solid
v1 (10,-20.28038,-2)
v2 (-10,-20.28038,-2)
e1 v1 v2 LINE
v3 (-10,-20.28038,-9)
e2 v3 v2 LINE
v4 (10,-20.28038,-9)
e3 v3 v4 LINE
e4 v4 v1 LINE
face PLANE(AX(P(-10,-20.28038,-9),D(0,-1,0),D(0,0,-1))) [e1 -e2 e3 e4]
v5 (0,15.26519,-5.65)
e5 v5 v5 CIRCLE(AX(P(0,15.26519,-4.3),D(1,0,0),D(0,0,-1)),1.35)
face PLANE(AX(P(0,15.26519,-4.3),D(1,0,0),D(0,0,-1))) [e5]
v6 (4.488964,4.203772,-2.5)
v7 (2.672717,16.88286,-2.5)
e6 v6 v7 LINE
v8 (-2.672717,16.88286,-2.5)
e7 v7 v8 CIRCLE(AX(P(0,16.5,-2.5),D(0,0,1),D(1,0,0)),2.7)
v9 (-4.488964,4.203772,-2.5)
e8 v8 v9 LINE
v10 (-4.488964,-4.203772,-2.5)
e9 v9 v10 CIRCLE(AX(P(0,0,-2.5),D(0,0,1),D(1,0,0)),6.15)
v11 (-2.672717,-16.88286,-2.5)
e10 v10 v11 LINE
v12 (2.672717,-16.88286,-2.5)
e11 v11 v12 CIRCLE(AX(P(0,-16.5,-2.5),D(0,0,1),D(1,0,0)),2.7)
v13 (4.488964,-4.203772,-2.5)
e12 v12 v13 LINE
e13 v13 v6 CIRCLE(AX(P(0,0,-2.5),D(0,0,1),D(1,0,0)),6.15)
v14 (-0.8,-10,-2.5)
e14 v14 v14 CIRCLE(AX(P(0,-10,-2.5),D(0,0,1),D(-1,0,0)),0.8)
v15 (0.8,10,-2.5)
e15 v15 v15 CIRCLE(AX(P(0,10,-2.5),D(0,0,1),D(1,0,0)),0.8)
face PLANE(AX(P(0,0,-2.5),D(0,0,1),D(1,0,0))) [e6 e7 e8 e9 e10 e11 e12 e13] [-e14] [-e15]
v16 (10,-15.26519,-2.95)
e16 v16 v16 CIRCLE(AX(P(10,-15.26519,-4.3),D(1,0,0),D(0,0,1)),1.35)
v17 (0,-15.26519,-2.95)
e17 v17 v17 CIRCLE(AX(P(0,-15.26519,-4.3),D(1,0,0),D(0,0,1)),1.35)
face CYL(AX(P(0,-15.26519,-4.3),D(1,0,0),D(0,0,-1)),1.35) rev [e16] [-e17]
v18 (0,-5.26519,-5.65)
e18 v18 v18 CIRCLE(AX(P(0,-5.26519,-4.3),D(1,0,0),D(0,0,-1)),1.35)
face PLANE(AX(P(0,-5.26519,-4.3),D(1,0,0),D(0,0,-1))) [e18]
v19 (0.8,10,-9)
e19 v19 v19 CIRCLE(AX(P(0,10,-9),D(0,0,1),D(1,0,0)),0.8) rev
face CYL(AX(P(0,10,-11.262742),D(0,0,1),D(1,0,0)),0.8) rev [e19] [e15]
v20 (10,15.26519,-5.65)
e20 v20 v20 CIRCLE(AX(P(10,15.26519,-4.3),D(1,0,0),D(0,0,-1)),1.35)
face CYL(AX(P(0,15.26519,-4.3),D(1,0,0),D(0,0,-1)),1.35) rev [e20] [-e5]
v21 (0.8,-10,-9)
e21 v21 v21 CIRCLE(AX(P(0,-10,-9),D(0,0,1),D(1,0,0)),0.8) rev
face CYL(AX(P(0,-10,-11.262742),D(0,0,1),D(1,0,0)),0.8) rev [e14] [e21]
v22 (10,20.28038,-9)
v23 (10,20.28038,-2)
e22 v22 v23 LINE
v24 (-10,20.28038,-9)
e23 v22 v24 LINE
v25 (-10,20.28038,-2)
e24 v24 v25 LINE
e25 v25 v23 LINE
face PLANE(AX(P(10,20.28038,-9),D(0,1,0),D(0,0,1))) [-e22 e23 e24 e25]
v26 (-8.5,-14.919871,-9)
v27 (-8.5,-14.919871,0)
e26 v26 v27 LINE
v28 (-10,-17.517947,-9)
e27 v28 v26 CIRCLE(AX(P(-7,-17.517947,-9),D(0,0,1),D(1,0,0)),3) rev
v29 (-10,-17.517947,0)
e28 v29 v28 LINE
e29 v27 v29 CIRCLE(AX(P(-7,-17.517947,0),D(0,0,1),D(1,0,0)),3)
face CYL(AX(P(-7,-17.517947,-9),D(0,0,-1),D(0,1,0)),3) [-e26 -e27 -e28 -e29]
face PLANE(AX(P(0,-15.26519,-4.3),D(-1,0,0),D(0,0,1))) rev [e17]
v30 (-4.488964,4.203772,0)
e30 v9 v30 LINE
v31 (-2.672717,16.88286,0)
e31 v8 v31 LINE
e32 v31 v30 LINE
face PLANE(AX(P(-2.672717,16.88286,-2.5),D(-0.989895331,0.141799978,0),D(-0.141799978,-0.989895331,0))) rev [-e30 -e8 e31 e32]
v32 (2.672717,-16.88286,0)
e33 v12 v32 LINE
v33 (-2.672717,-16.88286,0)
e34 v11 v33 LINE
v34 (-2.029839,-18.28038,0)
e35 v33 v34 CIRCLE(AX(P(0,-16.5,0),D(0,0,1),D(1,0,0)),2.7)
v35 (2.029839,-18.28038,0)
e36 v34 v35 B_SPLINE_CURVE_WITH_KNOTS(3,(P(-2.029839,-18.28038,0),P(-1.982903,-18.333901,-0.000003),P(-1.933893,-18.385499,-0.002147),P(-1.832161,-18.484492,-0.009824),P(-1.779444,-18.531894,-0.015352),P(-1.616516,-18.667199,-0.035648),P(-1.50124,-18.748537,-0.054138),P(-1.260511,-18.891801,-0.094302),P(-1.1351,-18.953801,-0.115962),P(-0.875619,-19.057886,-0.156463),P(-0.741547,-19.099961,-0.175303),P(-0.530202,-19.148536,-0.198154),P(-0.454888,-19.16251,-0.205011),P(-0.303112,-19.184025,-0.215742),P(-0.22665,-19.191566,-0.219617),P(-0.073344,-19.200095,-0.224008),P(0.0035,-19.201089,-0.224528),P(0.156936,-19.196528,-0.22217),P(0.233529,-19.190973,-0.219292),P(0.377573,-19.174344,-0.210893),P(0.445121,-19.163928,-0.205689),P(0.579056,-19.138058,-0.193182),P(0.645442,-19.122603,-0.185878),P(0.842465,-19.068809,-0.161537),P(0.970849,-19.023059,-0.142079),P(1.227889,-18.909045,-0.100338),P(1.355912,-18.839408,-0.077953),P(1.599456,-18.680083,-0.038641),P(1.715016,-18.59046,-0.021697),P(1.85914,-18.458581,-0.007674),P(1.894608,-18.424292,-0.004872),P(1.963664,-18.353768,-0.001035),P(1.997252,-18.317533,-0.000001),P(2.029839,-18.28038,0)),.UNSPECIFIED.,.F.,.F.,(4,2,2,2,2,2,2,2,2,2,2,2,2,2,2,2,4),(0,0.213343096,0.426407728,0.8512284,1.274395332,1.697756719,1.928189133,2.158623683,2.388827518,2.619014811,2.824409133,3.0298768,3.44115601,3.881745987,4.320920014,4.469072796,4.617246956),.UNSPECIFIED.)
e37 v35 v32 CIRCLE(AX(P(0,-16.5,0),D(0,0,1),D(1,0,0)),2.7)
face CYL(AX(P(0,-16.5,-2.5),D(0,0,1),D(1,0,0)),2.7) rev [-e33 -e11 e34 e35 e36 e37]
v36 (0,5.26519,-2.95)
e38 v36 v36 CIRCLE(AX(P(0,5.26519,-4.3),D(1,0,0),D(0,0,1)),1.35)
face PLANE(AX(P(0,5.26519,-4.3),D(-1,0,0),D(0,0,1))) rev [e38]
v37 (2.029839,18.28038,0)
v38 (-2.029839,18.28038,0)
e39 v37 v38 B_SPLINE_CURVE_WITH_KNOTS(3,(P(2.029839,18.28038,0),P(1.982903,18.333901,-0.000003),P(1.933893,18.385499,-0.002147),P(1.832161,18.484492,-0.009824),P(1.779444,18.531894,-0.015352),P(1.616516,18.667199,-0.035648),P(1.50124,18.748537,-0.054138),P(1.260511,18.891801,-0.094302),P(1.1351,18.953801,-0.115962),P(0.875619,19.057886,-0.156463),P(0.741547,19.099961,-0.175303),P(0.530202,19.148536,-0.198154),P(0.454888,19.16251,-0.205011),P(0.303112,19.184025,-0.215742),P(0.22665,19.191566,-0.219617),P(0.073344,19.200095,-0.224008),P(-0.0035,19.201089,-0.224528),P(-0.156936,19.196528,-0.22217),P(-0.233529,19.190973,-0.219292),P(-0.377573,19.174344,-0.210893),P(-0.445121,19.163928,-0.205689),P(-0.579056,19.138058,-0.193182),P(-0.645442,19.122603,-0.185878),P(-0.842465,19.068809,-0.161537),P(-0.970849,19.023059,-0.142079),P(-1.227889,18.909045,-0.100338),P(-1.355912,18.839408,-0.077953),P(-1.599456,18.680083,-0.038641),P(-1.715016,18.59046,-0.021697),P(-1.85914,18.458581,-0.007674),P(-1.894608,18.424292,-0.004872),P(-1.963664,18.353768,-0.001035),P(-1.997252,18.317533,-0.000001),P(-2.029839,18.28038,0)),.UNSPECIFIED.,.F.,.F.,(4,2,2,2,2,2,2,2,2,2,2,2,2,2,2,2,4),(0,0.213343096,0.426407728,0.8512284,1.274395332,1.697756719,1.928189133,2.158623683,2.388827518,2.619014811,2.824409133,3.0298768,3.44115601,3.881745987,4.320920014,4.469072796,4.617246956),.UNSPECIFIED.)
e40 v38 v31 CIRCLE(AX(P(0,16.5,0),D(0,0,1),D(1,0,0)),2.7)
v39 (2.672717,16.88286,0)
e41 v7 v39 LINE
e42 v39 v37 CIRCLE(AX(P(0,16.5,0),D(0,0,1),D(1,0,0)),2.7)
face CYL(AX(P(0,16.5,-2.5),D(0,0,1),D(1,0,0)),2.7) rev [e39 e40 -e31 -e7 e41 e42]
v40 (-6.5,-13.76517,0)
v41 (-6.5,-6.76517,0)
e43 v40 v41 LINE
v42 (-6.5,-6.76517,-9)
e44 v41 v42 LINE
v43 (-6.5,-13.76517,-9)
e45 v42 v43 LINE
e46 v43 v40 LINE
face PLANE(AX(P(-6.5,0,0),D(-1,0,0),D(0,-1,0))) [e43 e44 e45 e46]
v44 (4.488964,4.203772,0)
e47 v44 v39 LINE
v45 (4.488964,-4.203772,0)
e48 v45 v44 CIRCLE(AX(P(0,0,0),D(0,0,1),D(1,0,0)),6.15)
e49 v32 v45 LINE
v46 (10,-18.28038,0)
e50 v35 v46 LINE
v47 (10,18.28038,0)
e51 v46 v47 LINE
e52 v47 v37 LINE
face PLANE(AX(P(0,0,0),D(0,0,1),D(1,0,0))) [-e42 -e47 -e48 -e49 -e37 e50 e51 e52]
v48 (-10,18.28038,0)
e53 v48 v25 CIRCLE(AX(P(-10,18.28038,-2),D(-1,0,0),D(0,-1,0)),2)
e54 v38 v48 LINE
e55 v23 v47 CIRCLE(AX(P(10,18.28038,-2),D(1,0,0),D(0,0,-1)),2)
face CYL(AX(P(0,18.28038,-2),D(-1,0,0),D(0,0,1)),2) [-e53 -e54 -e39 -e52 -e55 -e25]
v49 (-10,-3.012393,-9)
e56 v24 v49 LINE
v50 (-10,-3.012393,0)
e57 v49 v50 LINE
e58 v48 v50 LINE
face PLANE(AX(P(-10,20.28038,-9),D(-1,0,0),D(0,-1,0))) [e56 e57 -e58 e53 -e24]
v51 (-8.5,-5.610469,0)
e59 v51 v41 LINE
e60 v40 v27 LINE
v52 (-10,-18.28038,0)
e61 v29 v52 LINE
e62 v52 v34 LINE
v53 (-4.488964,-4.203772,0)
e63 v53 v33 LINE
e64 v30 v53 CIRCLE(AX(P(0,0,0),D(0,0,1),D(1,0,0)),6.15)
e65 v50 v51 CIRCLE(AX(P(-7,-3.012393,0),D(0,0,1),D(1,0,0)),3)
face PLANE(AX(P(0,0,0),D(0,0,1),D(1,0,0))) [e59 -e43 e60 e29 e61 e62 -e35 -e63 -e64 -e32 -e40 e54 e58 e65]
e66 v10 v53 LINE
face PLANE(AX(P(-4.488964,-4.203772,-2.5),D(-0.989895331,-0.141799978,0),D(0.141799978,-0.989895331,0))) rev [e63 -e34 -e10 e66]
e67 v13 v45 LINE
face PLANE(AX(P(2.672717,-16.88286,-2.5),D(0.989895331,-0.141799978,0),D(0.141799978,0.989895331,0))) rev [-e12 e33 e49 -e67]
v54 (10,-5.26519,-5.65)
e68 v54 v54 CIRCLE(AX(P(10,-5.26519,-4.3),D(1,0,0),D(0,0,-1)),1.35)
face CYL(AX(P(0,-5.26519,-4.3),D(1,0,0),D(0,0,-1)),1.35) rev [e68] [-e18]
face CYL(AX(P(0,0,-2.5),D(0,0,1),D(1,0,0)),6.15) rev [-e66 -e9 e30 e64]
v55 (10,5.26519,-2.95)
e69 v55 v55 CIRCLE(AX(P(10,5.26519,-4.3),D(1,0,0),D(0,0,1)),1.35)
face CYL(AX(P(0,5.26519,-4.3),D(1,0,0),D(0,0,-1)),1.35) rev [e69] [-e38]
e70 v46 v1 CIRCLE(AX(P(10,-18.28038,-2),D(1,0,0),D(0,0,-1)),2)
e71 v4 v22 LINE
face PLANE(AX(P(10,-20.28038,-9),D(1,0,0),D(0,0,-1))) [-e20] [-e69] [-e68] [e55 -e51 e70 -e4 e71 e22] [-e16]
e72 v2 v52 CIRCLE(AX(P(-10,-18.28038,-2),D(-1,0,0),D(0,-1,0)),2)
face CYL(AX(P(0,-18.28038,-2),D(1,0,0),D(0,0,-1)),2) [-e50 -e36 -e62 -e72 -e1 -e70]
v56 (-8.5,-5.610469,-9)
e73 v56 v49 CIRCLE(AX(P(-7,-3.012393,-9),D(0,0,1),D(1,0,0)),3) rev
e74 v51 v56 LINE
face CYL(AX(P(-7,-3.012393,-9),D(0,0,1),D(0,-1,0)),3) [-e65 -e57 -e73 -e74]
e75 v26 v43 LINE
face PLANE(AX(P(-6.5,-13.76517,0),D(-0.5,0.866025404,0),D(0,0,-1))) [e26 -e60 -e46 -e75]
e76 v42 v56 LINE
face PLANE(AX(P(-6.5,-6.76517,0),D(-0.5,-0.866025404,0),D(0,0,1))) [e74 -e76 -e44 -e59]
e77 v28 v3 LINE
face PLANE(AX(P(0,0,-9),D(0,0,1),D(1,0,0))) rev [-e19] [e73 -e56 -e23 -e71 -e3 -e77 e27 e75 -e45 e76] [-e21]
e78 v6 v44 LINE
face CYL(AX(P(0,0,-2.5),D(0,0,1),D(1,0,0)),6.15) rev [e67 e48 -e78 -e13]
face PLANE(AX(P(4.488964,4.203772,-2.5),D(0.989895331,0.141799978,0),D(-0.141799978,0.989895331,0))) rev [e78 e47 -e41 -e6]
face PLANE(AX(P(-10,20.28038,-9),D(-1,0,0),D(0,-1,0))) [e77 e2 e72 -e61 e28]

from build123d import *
from OCP.BRepFilletAPI import BRepFilletAPI_MakeChamfer

# Parameters (mm, degrees)
SKETCH1_W           = 20
SKETCH1_H           = 40.56076
BOSS_EXTRUDE1_DEPTH = 9
SKETCH6_R           = 1.35
CUT_EXTRUDE1_DEPTH  = 10
CUT_EXTRUDE2_DEPTH  = 2.5
FILLET1_R           = 2
SKETCH9_R           = 0.8
CUT_EXTRUDE3_DEPTH  = 6.5
SKETCH10_W          = 9
SKETCH10_H          = 7
CUT_EXTRUDE4_DEPTH  = 3.5
CHAMFER1_SIZE       = 2.020725942
CHAMFER1_SIZE_2     = 3.5
FILLET2_R           = 3


# Some blends are built 0.0001 mm under size
with BuildPart() as part:
    # Sketch1 → Boss-Extrude1 (new body)
    with BuildSketch(Plane.XY):
        Rectangle(SKETCH1_W, SKETCH1_H)
    extrude(amount=-BOSS_EXTRUDE1_DEPTH)

    # Sketch6 → Cut-Extrude1 (cut)
    with BuildSketch(Plane(origin=(10, 0, 0), x_dir=(0, 0, -1), z_dir=(1, 0, 0))):
        with Locations(Location((4.3, -15.26519, 0), (0, 0, 180))):
            Circle(SKETCH6_R)
        with Locations((4.3, -5.26519)):
            Circle(SKETCH6_R)
        with Locations((4.3, 15.26519)):
            Circle(SKETCH6_R)
        with Locations(Location((4.3, 5.26519, 0), (0, 0, 180))):
            Circle(SKETCH6_R)
    extrude(amount=-CUT_EXTRUDE1_DEPTH, mode=Mode.SUBTRACT)

    # Sketch8 → Cut-Extrude2 (cut)
    with BuildSketch(Plane.XY):
        with BuildLine():
            Line((-4.488964362, -4.203771991), (-2.672717394, -16.882859941))
            ThreePointArc((-2.672717394, -16.882859941), (0, -19.2), (2.672717394, -16.882859941))
            Line((2.672717394, -16.882859941), (4.488964362, -4.203771991))
            ThreePointArc((4.488964362, -4.203771991), (6.15, 0), (4.488964362, 4.203771991))
            Line((4.488964362, 4.203771991), (2.672717394, 16.882859941))
            ThreePointArc((2.672717394, 16.882859941), (0, 19.2), (-2.672717394, 16.882859941))
            Line((-2.672717394, 16.882859941), (-4.488964362, 4.203771991))
            ThreePointArc((-4.488964362, 4.203771991), (-6.15, 0), (-4.488964362, -4.203771991))
        make_face()
    extrude(amount=-CUT_EXTRUDE2_DEPTH, mode=Mode.SUBTRACT)

    # Fillet1
    # the kernel refuses this fillet: 2 mm, written as the material it takes off along each edge
    with BuildSketch(Plane(origin=(-15, -20.28038, 0), x_dir=(0, 0, -1), z_dir=(1, 0, 0)), Plane(origin=(15, 20.28038, 0), x_dir=(0, 0, -1), z_dir=(-1, 0, 0))) as fillet1_piece_1:
        with BuildLine():
            CenterArc((FILLET1_R, FILLET1_R), FILLET1_R, 180, 90)
            Line((0, FILLET1_R), (0, 0))
            Line((0, 0), (FILLET1_R, 0))
        make_face()
    extrude(amount=30, mode=Mode.SUBTRACT)

    # Sketch9 → Cut-Extrude3 (cut)
    with BuildSketch(Plane.XY.offset(-2.5)):
        with Locations((0, 10)):
            Circle(SKETCH9_R)
        with Locations((0, -10)):
            Circle(SKETCH9_R)
    extrude(amount=-CUT_EXTRUDE3_DEPTH, mode=Mode.SUBTRACT)

    # Sketch10 → Cut-Extrude4 (cut)
    with BuildSketch(Plane.ZY.offset(10)):
        with Locations((-4.5, -10.26517)):
            Rectangle(SKETCH10_W, SKETCH10_H)
    extrude(amount=-CUT_EXTRUDE4_DEPTH, mode=Mode.SUBTRACT)

    # Chamfer1
    chamfer1_edges_1 = [part.edges().sort_by_distance(p)[0] for p in [
        (-10, -6.76517, -4.5),
    ]]
    chamfer1_side_1 = [part.faces().sort_by_distance(p)[0] for p in [
        (-10, -6.724755481, -4.5),
    ]]
    chamfer1_edges_2 = [part.edges().sort_by_distance(p)[0] for p in [
        (-10, -13.76517, -4.5),
    ]]
    chamfer1_side_2 = [part.faces().sort_by_distance(p)[0] for p in [
        (-10, -13.805584519, -4.5),
    ]]
    chamfer1 = BRepFilletAPI_MakeChamfer(part.part.solid().wrapped)
    for e in chamfer1_edges_1:
        chamfer1.Add(CHAMFER1_SIZE - 0.0001, CHAMFER1_SIZE_2 - 0.0001, e.wrapped, chamfer1_side_1[0].wrapped)
    for e in chamfer1_edges_2:
        chamfer1.Add(CHAMFER1_SIZE - 0.0001, CHAMFER1_SIZE_2 - 0.0001, e.wrapped, chamfer1_side_2[0].wrapped)
    add(Compound.cast(chamfer1.Shape()), mode=Mode.REPLACE)  # a hair under: the kernel refuses the full size

    # Fillet2
    fillet2_edges = [part.edges().sort_by_distance(p)[0] for p in [
        (-10, -4.744544058, -4.5),
        (-10, -15.785795942, -4.5),
    ]]
    fillet(fillet2_edges, radius=FILLET2_R)


solid = part.part
